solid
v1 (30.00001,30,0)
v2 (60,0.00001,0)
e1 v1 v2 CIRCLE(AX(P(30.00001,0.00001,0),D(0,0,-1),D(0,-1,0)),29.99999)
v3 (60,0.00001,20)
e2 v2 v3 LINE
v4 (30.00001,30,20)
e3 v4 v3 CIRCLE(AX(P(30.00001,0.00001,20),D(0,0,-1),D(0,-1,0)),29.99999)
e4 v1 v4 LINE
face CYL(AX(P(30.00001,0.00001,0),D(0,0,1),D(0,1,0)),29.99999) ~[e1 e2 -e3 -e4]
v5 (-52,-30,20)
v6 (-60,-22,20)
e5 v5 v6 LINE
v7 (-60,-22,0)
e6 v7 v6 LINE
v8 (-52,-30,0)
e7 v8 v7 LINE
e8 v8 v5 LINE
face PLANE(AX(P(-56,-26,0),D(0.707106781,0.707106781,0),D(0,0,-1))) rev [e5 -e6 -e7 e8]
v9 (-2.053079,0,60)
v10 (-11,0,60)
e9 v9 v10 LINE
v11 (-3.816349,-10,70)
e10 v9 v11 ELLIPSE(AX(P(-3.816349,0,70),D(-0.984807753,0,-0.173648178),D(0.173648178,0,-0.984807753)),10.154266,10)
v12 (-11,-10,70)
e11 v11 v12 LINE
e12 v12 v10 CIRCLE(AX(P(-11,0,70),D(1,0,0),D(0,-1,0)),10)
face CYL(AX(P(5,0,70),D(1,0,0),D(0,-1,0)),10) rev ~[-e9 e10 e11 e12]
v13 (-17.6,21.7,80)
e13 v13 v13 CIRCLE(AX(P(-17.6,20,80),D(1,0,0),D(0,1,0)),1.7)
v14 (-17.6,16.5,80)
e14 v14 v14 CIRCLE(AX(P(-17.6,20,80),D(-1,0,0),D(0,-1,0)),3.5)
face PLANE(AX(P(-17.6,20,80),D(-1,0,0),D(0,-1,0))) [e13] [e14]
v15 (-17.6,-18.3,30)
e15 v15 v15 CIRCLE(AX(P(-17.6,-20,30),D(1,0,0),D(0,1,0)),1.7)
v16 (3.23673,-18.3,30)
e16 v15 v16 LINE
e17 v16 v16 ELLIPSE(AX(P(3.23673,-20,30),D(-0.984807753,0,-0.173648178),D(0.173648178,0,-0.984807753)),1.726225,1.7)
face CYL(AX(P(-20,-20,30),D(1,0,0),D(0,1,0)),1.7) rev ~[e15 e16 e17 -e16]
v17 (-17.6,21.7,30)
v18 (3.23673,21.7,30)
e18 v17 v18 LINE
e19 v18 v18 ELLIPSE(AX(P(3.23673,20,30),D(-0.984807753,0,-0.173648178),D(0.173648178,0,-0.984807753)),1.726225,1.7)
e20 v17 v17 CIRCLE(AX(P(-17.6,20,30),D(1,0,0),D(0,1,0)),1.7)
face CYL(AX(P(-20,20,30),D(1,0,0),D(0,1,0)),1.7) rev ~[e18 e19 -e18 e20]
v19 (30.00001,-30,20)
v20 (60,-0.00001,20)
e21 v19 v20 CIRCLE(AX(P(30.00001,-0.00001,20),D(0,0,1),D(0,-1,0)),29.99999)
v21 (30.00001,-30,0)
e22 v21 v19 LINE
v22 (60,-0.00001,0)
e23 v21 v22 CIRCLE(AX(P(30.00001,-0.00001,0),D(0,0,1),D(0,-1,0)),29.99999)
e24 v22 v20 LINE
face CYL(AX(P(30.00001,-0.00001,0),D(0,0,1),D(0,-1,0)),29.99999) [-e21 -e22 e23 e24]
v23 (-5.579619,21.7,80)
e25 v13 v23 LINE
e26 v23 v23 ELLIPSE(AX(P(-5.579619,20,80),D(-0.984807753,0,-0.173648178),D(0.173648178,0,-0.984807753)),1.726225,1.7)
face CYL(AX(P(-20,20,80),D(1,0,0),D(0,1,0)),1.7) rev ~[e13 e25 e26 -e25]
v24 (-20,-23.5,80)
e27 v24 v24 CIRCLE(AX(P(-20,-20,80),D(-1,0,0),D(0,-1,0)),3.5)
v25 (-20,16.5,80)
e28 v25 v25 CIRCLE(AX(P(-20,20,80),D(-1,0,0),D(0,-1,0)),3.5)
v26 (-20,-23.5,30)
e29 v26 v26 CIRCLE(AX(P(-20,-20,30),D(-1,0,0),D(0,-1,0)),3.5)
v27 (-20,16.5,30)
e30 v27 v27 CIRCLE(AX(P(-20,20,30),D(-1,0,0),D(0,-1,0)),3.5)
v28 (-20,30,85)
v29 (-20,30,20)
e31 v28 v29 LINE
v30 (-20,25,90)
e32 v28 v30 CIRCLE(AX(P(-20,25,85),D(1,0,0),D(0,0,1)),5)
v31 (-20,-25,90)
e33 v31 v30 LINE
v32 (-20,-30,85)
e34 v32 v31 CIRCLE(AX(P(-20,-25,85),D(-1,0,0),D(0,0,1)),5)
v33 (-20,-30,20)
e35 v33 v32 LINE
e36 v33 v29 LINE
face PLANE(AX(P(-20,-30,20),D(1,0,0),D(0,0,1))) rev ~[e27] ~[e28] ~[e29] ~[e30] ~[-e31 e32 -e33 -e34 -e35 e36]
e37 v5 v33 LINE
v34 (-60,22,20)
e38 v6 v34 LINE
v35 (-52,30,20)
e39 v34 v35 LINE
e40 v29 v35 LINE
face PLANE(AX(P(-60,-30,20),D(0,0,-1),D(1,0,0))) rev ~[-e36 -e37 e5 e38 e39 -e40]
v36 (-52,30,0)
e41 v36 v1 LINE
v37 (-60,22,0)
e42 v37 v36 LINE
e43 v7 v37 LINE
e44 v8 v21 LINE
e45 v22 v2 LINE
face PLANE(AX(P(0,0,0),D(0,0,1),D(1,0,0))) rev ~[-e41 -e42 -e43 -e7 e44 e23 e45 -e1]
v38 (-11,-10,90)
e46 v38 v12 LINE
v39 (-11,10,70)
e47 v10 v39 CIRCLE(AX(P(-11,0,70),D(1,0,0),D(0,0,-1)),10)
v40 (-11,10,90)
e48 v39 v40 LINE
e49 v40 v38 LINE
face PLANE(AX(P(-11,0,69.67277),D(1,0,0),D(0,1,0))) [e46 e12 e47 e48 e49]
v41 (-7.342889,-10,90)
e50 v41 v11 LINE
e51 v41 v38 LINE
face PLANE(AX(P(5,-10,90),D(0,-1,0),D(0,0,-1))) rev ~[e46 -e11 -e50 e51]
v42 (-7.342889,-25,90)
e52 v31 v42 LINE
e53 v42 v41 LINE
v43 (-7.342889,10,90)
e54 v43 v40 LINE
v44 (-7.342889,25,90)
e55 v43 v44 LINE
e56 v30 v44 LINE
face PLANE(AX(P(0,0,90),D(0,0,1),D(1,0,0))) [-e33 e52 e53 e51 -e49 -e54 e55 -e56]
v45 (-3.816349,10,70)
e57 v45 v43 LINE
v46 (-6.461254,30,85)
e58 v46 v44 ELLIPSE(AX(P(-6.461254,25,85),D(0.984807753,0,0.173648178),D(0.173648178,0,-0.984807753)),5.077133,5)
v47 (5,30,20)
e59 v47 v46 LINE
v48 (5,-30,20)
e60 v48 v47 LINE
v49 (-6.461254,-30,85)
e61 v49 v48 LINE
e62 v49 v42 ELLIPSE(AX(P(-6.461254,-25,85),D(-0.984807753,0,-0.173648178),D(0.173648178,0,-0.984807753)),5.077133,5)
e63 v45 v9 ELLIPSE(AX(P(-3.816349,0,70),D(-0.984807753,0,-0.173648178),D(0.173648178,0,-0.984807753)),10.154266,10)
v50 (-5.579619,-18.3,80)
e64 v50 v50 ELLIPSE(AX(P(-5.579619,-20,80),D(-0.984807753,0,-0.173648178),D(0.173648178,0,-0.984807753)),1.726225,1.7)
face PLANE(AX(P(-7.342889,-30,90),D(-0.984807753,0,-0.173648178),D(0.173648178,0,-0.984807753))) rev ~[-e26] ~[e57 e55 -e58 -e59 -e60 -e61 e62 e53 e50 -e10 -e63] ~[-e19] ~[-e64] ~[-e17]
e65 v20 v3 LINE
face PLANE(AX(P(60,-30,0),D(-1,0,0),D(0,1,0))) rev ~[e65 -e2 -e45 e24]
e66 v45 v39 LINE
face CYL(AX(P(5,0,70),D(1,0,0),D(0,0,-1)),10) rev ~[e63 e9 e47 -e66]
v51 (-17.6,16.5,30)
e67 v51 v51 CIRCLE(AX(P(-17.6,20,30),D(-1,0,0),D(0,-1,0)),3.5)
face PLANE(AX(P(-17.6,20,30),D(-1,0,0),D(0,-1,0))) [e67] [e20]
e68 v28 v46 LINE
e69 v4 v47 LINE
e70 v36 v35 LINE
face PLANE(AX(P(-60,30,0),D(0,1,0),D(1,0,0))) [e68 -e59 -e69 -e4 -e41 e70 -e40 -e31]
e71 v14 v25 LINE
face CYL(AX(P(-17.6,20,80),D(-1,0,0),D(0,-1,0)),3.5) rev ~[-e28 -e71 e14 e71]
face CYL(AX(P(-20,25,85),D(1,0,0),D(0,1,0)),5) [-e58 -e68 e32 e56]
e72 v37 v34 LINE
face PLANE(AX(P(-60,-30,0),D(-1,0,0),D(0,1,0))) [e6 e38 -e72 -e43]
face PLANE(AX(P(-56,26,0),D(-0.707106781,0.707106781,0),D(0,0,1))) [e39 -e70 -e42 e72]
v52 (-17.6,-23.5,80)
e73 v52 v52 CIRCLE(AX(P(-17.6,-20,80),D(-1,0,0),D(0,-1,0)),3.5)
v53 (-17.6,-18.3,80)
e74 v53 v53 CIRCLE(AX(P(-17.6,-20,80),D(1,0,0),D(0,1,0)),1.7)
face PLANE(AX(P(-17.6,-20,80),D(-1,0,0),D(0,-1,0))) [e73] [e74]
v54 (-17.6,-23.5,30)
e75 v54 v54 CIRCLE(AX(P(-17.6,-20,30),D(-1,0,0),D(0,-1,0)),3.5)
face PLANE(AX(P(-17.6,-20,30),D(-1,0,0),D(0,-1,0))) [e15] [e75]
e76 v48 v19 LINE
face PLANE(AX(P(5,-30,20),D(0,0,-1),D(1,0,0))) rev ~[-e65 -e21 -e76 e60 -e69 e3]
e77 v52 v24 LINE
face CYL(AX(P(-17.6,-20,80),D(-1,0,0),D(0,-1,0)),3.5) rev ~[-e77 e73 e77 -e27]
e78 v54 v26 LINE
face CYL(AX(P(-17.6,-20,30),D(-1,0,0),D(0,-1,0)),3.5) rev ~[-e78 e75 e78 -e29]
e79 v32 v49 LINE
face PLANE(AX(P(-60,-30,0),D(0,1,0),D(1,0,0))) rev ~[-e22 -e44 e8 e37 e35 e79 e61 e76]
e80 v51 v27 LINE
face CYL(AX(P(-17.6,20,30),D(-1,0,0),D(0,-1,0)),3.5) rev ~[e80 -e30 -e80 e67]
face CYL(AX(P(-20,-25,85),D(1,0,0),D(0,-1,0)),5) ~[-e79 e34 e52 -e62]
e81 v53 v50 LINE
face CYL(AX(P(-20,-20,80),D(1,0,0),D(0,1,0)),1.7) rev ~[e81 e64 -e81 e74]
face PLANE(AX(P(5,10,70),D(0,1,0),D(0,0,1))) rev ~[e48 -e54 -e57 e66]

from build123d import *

# Parameters (mm, degrees)
F0_W           = 120
F0_H           = 60
F1_DEPTH       = 90
F2_W           = 40
F2_H           = 70
F2_W_2         = 55
F3_DEPTH       = 60.001
F4_R           = 29.99999
F5_SIZE        = 8
F7_D           = 3.4
F7_CBORE_D     = 7
F7_CBORE_DEPTH = 2.4
F9_DEPTH       = 16
F11_DEPTH      = 60.001
F12_R          = 5


# Not quite as in the source:
# - a fillet or chamfer is up to 0.001 mm smaller than in the source, because OpenCascade refuses the exact size


with BuildPart() as f1:
    # F0 (on Top) → F1 (new body)
    with BuildSketch(Plane.XY):
        Rectangle(F0_W, F0_H)
    extrude(amount=F1_DEPTH)

    # F2 (on face) → F3 (cut, through all)
    with BuildSketch(Plane.XZ.offset(30)):
        with Locations((-40, 55)):
            Rectangle(F2_W, F2_H)
        with Locations((32.5, 55)):
            Rectangle(F2_W_2, F2_H)
    extrude(amount=-F3_DEPTH, mode=Mode.SUBTRACT)

    # F4 (radius 30 in the source; OpenCascade refuses exactly that, so slightly less here)
    f4_edges = [f1.edges().sort_by_distance(p)[0] for p in [
        (60, -30, 10),
        (60, 30, 10),
    ]]
    fillet(f4_edges, radius=F4_R)

    # F5
    f5_edges = [f1.edges().sort_by_distance(p)[0] for p in [
        (-60, -30, 10),
        (-60, 30, 10),
    ]]
    chamfer(f5_edges, length=F5_SIZE)

    # F7 (through all)
    with Locations(Plane(origin=(-20, 0, 0), x_dir=(0, -1, 0), z_dir=(-1, 0, 0))):
        with Locations((-20, 80), (20, 80), (20, 30), (-20, 30)):
            CounterBoreHole(F7_D / 2, F7_CBORE_D / 2, F7_CBORE_DEPTH)

    # F8 (on face) → F9 (cut)
    with BuildSketch(Plane.YZ.offset(5)):
        with BuildLine():
            ThreePointArc((10, 70), (0, 80), (-10, 70))
            ThreePointArc((-10, 70), (-7.0710678119, 62.9289321881), (0, 60))
            ThreePointArc((0, 60), (7.0710678119, 62.9289321881), (10, 70))
        make_face()
        with BuildLine():
            Line((10, 90), (-10, 90))
            Line((-10, 90), (-10, 70))
            ThreePointArc((-10, 70), (0, 80), (10, 70))
            Line((10, 70), (10, 90))
        make_face()
    extrude(amount=-F9_DEPTH, mode=Mode.SUBTRACT)

    # F10 (on face) → F11 (cut, through all)
    with BuildSketch(Plane.XZ.offset(30)):
        Polygon((5, 90), (-7.3428886496, 90), (5, 20), align=None)
    extrude(amount=-F11_DEPTH, mode=Mode.SUBTRACT)

    # F12
    f12_edges = [f1.edges().sort_by_distance(p)[0] for p in [
        (-13.671444, -30, 90),
        (-13.671444, 30, 90),
    ]]
    fillet(f12_edges, radius=F12_R)


solid = f1.part
